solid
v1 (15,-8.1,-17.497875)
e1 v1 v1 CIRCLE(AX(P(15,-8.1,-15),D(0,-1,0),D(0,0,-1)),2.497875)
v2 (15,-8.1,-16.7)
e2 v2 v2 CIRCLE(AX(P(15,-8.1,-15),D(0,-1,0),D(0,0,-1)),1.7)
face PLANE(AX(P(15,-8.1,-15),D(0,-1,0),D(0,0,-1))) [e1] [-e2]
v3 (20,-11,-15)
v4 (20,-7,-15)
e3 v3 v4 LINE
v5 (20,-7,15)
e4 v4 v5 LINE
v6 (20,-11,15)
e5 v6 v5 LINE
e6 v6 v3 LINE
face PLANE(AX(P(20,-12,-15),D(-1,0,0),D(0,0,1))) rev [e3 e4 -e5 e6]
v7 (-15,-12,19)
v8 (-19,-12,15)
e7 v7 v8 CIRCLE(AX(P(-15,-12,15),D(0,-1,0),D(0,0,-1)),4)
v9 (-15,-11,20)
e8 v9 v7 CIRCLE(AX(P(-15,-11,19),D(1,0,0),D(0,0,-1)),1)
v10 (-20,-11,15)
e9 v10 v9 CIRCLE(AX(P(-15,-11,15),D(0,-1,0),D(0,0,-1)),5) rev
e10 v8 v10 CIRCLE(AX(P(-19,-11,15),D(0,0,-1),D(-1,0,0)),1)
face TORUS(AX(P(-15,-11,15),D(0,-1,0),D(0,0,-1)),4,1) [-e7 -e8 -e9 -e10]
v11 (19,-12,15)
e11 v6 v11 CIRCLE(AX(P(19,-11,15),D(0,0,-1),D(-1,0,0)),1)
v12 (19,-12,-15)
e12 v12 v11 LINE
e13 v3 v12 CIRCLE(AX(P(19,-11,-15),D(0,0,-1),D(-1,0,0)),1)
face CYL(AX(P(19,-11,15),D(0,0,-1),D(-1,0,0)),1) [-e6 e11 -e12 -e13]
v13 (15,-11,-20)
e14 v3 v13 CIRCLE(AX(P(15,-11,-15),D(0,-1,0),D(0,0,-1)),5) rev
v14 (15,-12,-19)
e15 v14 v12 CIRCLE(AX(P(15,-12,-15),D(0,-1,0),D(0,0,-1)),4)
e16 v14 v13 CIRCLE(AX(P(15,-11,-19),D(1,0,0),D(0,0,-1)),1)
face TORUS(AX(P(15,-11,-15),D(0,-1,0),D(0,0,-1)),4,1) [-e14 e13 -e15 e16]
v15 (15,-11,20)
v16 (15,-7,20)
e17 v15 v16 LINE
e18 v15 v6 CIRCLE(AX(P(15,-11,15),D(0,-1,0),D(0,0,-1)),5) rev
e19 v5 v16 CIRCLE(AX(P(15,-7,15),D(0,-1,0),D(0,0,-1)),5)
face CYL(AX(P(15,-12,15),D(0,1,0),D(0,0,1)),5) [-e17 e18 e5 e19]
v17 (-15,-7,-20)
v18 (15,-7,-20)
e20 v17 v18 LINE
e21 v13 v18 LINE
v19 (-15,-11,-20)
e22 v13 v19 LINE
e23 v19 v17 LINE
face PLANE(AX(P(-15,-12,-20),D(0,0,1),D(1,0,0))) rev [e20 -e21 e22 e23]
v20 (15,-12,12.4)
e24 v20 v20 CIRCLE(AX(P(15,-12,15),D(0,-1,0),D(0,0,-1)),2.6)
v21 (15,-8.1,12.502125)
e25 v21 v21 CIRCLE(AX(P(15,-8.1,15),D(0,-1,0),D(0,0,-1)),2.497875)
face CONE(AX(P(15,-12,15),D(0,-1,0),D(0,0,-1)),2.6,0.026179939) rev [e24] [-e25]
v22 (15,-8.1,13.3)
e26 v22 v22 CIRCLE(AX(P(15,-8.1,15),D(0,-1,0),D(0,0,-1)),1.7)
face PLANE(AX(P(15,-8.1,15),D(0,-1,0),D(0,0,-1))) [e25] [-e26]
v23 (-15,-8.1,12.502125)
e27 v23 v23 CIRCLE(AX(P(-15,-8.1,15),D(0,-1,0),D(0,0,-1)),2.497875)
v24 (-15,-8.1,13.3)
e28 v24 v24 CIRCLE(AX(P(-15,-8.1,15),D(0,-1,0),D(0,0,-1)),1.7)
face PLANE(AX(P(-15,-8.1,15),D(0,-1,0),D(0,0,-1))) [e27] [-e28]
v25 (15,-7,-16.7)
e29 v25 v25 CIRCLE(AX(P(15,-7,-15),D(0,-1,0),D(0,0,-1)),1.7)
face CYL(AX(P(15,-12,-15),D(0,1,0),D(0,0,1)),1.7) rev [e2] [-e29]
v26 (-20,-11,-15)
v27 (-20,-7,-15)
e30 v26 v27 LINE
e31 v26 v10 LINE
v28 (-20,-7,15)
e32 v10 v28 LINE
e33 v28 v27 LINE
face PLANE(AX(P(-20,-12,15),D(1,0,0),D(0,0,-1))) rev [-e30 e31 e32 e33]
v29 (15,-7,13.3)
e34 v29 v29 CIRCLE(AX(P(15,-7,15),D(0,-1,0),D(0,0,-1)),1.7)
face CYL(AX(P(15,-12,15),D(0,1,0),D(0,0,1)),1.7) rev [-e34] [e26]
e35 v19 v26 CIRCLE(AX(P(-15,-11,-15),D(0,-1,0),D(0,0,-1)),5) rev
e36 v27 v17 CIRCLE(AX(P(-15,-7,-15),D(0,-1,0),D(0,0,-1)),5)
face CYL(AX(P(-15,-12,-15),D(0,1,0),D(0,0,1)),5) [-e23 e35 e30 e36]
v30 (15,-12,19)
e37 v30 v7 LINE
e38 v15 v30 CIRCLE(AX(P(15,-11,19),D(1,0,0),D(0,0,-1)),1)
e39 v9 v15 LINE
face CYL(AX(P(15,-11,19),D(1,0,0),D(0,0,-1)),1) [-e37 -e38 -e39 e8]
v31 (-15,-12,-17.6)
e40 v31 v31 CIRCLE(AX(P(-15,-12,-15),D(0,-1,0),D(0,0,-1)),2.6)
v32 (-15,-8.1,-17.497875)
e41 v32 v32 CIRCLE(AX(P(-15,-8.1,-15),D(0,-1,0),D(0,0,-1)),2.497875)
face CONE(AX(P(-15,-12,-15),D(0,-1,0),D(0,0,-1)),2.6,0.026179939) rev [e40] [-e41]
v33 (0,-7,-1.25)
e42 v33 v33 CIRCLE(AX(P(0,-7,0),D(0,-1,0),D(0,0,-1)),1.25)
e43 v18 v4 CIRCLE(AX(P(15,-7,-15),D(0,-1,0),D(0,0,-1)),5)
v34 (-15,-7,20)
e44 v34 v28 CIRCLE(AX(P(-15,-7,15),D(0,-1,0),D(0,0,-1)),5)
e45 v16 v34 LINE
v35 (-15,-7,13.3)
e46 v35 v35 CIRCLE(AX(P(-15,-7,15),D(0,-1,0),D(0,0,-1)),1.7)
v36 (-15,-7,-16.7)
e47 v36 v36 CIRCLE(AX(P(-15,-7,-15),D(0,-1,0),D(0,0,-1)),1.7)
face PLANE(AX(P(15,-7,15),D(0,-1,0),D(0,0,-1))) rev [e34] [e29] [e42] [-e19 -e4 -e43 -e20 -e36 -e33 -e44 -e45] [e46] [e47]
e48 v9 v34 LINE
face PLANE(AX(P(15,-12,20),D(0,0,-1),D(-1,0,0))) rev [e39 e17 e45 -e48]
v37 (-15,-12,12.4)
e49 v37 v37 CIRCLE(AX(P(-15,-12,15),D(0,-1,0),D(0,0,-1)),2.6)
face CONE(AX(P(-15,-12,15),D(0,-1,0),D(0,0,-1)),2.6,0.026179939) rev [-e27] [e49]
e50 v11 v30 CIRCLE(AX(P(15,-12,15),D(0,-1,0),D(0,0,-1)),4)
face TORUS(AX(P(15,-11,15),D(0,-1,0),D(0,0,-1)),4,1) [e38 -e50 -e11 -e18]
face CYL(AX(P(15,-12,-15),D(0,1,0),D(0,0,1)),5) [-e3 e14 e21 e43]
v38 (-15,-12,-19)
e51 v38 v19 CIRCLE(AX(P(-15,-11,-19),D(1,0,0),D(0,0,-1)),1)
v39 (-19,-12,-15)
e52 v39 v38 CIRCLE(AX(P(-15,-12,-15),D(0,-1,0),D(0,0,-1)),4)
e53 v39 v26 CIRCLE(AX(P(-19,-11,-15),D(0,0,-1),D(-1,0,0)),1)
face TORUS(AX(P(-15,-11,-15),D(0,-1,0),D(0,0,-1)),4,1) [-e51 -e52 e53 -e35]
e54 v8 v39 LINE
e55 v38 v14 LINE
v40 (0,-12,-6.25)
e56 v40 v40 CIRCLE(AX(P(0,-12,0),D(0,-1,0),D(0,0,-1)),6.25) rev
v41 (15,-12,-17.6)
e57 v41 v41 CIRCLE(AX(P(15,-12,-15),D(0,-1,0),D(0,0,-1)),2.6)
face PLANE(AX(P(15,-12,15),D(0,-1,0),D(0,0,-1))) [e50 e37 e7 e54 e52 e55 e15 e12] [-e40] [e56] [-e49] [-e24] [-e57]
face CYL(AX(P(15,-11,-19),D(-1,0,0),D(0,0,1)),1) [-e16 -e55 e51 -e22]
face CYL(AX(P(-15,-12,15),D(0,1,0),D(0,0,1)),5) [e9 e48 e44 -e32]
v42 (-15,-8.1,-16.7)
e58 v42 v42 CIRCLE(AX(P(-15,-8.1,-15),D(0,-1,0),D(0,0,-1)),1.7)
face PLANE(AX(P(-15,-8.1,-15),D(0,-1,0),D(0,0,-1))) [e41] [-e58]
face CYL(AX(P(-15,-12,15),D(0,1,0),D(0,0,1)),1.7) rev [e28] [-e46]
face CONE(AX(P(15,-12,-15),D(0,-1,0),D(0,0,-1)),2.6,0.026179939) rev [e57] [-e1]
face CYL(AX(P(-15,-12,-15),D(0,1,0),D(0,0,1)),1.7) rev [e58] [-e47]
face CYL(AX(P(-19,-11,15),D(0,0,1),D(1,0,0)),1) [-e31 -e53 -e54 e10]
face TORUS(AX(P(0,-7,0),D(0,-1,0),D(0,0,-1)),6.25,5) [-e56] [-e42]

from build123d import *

# Parameters (mm, degrees)
BOSS_EXTRUDE1_DEPTH          = 5
SKETCH1_3_R                  = 1.7
SKETCH1_3_R_2                = 1.25
CUT_EXTRUDE3_DEPTH           = 29.722813233
CUT_EXTRUDE4_START           = 5
SKETCH1_4_R                  = 2.6
CUT_EXTRUDE4_DEPTH           = 3.9
CUT_EXTRUDE4_DRAFT           = -1.5
CUT_EXTRUDE4_PROFILE_2_DEPTH = 3.9
CUT_EXTRUDE4_PROFILE_2_DRAFT = -1.5
CUT_EXTRUDE4_PROFILE_3_DEPTH = 3.9
CUT_EXTRUDE4_PROFILE_3_DRAFT = -1.5
CUT_EXTRUDE4_PROFILE_4_DEPTH = 3.9
CUT_EXTRUDE4_PROFILE_4_DRAFT = -1.5
FILLET1_R                    = 5
FILLET2_R                    = 1


with BuildPart() as part:
    # Sketch1 → Boss-Extrude1 (new body)
    with BuildSketch(Plane(origin=(0, -7, 0), x_dir=(-1, 0, 0), z_dir=(0, -1, 0))):
        with BuildLine():
            Line((15, 20), (-15, 20))
            ThreePointArc((-15, 20), (-18.535533906, 18.535533906), (-20, 15))
            Line((-20, 15), (-20, -15))
            ThreePointArc((-20, -15), (-18.535533906, -18.535533906), (-15, -20))
            Line((-15, -20), (15, -20))
            ThreePointArc((15, -20), (18.535533906, -18.535533906), (20, -15))
            Line((20, -15), (20, 15))
            ThreePointArc((20, 15), (18.535533906, 18.535533906), (15, 20))
        make_face()
    extrude(amount=BOSS_EXTRUDE1_DEPTH)

    # Sketch1<3> → Cut-Extrude3 (cut, through all)
    with BuildSketch(Plane(origin=(0, -7, 0), x_dir=(-1, 0, 0), z_dir=(0, -1, 0))):
        with Locations(Location((-15, 15, 0), (0, 0, 90))):
            Circle(SKETCH1_3_R)
        with Locations(Location((15, 15, 0), (0, 0, 90))):
            Circle(SKETCH1_3_R)
        with Locations(Location((-15, -15, 0), (0, 0, 90))):
            Circle(SKETCH1_3_R)
        with Locations(Location((15, -15, 0), (0, 0, 90))):
            Circle(SKETCH1_3_R)
        with Locations(Location((0, 0, 0), (0, 0, 90))):
            Circle(SKETCH1_3_R_2)
    extrude(amount=CUT_EXTRUDE3_DEPTH, mode=Mode.SUBTRACT)


with BuildPart() as cut_extrude4_tool:
    # Sketch1<4> → Cut-Extrude4 (with draft: the straight prism first)
    with BuildSketch(Plane(origin=(0, -7, 0), x_dir=(-1, 0, 0), z_dir=(0, -1, 0)).offset(CUT_EXTRUDE4_START)):
        with Locations((15, -15)):
            Circle(SKETCH1_4_R)
    extrude(amount=-CUT_EXTRUDE4_DEPTH)
    # Cut-Extrude4: the draft: its side faces are tilted about the plane it starts from
    cut_extrude4_sides = [cut_extrude4_tool.faces().sort_by_distance(p)[0] for p in [
        (-12.4, -10.05, 15),
    ]]
    draft(cut_extrude4_sides, Plane(origin=(0, -7, 0), x_dir=(-1, 0, 0), z_dir=(0, -1, 0)).offset(CUT_EXTRUDE4_START), CUT_EXTRUDE4_DRAFT)


with BuildPart() as part_1:
    add(part.part)

    # Cut-Extrude4: cut by cut_extrude4_tool
    add(cut_extrude4_tool.part, mode=Mode.SUBTRACT)


with BuildPart() as cut_extrude4_profile_2_tool:
    # Sketch1<4> → Cut-Extrude4 profile 2 (with draft: the straight prism first)
    with BuildSketch(Plane(origin=(0, -7, 0), x_dir=(-1, 0, 0), z_dir=(0, -1, 0)).offset(CUT_EXTRUDE4_START)):
        with Locations((-15, -15)):
            Circle(SKETCH1_4_R)
    extrude(amount=-CUT_EXTRUDE4_PROFILE_2_DEPTH)
    # Cut-Extrude4 profile 2: the draft: its side faces are tilted about the plane it starts from
    cut_extrude4_profile_2_sides = [cut_extrude4_profile_2_tool.faces().sort_by_distance(p)[0] for p in [
        (17.6, -10.05, 15),
    ]]
    draft(cut_extrude4_profile_2_sides, Plane(origin=(0, -7, 0), x_dir=(-1, 0, 0), z_dir=(0, -1, 0)).offset(CUT_EXTRUDE4_START), CUT_EXTRUDE4_PROFILE_2_DRAFT)


with BuildPart() as part_2:
    add(part_1.part)

    # Cut-Extrude4 profile 2: cut by cut_extrude4_profile_2_tool
    add(cut_extrude4_profile_2_tool.part, mode=Mode.SUBTRACT)


with BuildPart() as cut_extrude4_profile_3_tool:
    # Sketch1<4> → Cut-Extrude4 profile 3 (with draft: the straight prism first)
    with BuildSketch(Plane(origin=(0, -7, 0), x_dir=(-1, 0, 0), z_dir=(0, -1, 0)).offset(CUT_EXTRUDE4_START)):
        with Locations((-15, 15)):
            Circle(SKETCH1_4_R)
    extrude(amount=-CUT_EXTRUDE4_PROFILE_3_DEPTH)
    # Cut-Extrude4 profile 3: the draft: its side faces are tilted about the plane it starts from
    cut_extrude4_profile_3_sides = [cut_extrude4_profile_3_tool.faces().sort_by_distance(p)[0] for p in [
        (17.6, -10.05, -15),
    ]]
    draft(cut_extrude4_profile_3_sides, Plane(origin=(0, -7, 0), x_dir=(-1, 0, 0), z_dir=(0, -1, 0)).offset(CUT_EXTRUDE4_START), CUT_EXTRUDE4_PROFILE_3_DRAFT)


with BuildPart() as part_3:
    add(part_2.part)

    # Cut-Extrude4 profile 3: cut by cut_extrude4_profile_3_tool
    add(cut_extrude4_profile_3_tool.part, mode=Mode.SUBTRACT)


with BuildPart() as cut_extrude4_profile_4_tool:
    # Sketch1<4> → Cut-Extrude4 profile 4 (with draft: the straight prism first)
    with BuildSketch(Plane(origin=(0, -7, 0), x_dir=(-1, 0, 0), z_dir=(0, -1, 0)).offset(CUT_EXTRUDE4_START)):
        with Locations((15, 15)):
            Circle(SKETCH1_4_R)
    extrude(amount=-CUT_EXTRUDE4_PROFILE_4_DEPTH)
    # Cut-Extrude4 profile 4: the draft: its side faces are tilted about the plane it starts from
    cut_extrude4_profile_4_sides = [cut_extrude4_profile_4_tool.faces().sort_by_distance(p)[0] for p in [
        (-12.4, -10.05, -15),
    ]]
    draft(cut_extrude4_profile_4_sides, Plane(origin=(0, -7, 0), x_dir=(-1, 0, 0), z_dir=(0, -1, 0)).offset(CUT_EXTRUDE4_START), CUT_EXTRUDE4_PROFILE_4_DRAFT)


with BuildPart() as part_4:
    add(part_3.part)

    # Cut-Extrude4 profile 4: cut by cut_extrude4_profile_4_tool
    add(cut_extrude4_profile_4_tool.part, mode=Mode.SUBTRACT)

    # Fillet1
    fillet1_edges = [part_4.edges().sort_by_distance(p)[0] for p in [
        (0, -12, 1.25),
    ]]
    fillet(fillet1_edges, radius=FILLET1_R - 0.0001)  # a hair under: the kernel refuses the full size

    # Fillet2
    fillet2_edges = [part_4.edges().sort_by_distance(p)[0] for p in [
        (-18.535533906, -12, 18.535533906),
        (-20, -12, 0),
        (-18.535533906, -12, -18.535533906),
        (0, -12, -20),
        (18.535533906, -12, -18.535533906),
        (20, -12, 0),
        (18.535533906, -12, 18.535533906),
        (0, -12, 20),
    ]]
    fillet(fillet2_edges, radius=FILLET2_R)


solid = part_4.part
